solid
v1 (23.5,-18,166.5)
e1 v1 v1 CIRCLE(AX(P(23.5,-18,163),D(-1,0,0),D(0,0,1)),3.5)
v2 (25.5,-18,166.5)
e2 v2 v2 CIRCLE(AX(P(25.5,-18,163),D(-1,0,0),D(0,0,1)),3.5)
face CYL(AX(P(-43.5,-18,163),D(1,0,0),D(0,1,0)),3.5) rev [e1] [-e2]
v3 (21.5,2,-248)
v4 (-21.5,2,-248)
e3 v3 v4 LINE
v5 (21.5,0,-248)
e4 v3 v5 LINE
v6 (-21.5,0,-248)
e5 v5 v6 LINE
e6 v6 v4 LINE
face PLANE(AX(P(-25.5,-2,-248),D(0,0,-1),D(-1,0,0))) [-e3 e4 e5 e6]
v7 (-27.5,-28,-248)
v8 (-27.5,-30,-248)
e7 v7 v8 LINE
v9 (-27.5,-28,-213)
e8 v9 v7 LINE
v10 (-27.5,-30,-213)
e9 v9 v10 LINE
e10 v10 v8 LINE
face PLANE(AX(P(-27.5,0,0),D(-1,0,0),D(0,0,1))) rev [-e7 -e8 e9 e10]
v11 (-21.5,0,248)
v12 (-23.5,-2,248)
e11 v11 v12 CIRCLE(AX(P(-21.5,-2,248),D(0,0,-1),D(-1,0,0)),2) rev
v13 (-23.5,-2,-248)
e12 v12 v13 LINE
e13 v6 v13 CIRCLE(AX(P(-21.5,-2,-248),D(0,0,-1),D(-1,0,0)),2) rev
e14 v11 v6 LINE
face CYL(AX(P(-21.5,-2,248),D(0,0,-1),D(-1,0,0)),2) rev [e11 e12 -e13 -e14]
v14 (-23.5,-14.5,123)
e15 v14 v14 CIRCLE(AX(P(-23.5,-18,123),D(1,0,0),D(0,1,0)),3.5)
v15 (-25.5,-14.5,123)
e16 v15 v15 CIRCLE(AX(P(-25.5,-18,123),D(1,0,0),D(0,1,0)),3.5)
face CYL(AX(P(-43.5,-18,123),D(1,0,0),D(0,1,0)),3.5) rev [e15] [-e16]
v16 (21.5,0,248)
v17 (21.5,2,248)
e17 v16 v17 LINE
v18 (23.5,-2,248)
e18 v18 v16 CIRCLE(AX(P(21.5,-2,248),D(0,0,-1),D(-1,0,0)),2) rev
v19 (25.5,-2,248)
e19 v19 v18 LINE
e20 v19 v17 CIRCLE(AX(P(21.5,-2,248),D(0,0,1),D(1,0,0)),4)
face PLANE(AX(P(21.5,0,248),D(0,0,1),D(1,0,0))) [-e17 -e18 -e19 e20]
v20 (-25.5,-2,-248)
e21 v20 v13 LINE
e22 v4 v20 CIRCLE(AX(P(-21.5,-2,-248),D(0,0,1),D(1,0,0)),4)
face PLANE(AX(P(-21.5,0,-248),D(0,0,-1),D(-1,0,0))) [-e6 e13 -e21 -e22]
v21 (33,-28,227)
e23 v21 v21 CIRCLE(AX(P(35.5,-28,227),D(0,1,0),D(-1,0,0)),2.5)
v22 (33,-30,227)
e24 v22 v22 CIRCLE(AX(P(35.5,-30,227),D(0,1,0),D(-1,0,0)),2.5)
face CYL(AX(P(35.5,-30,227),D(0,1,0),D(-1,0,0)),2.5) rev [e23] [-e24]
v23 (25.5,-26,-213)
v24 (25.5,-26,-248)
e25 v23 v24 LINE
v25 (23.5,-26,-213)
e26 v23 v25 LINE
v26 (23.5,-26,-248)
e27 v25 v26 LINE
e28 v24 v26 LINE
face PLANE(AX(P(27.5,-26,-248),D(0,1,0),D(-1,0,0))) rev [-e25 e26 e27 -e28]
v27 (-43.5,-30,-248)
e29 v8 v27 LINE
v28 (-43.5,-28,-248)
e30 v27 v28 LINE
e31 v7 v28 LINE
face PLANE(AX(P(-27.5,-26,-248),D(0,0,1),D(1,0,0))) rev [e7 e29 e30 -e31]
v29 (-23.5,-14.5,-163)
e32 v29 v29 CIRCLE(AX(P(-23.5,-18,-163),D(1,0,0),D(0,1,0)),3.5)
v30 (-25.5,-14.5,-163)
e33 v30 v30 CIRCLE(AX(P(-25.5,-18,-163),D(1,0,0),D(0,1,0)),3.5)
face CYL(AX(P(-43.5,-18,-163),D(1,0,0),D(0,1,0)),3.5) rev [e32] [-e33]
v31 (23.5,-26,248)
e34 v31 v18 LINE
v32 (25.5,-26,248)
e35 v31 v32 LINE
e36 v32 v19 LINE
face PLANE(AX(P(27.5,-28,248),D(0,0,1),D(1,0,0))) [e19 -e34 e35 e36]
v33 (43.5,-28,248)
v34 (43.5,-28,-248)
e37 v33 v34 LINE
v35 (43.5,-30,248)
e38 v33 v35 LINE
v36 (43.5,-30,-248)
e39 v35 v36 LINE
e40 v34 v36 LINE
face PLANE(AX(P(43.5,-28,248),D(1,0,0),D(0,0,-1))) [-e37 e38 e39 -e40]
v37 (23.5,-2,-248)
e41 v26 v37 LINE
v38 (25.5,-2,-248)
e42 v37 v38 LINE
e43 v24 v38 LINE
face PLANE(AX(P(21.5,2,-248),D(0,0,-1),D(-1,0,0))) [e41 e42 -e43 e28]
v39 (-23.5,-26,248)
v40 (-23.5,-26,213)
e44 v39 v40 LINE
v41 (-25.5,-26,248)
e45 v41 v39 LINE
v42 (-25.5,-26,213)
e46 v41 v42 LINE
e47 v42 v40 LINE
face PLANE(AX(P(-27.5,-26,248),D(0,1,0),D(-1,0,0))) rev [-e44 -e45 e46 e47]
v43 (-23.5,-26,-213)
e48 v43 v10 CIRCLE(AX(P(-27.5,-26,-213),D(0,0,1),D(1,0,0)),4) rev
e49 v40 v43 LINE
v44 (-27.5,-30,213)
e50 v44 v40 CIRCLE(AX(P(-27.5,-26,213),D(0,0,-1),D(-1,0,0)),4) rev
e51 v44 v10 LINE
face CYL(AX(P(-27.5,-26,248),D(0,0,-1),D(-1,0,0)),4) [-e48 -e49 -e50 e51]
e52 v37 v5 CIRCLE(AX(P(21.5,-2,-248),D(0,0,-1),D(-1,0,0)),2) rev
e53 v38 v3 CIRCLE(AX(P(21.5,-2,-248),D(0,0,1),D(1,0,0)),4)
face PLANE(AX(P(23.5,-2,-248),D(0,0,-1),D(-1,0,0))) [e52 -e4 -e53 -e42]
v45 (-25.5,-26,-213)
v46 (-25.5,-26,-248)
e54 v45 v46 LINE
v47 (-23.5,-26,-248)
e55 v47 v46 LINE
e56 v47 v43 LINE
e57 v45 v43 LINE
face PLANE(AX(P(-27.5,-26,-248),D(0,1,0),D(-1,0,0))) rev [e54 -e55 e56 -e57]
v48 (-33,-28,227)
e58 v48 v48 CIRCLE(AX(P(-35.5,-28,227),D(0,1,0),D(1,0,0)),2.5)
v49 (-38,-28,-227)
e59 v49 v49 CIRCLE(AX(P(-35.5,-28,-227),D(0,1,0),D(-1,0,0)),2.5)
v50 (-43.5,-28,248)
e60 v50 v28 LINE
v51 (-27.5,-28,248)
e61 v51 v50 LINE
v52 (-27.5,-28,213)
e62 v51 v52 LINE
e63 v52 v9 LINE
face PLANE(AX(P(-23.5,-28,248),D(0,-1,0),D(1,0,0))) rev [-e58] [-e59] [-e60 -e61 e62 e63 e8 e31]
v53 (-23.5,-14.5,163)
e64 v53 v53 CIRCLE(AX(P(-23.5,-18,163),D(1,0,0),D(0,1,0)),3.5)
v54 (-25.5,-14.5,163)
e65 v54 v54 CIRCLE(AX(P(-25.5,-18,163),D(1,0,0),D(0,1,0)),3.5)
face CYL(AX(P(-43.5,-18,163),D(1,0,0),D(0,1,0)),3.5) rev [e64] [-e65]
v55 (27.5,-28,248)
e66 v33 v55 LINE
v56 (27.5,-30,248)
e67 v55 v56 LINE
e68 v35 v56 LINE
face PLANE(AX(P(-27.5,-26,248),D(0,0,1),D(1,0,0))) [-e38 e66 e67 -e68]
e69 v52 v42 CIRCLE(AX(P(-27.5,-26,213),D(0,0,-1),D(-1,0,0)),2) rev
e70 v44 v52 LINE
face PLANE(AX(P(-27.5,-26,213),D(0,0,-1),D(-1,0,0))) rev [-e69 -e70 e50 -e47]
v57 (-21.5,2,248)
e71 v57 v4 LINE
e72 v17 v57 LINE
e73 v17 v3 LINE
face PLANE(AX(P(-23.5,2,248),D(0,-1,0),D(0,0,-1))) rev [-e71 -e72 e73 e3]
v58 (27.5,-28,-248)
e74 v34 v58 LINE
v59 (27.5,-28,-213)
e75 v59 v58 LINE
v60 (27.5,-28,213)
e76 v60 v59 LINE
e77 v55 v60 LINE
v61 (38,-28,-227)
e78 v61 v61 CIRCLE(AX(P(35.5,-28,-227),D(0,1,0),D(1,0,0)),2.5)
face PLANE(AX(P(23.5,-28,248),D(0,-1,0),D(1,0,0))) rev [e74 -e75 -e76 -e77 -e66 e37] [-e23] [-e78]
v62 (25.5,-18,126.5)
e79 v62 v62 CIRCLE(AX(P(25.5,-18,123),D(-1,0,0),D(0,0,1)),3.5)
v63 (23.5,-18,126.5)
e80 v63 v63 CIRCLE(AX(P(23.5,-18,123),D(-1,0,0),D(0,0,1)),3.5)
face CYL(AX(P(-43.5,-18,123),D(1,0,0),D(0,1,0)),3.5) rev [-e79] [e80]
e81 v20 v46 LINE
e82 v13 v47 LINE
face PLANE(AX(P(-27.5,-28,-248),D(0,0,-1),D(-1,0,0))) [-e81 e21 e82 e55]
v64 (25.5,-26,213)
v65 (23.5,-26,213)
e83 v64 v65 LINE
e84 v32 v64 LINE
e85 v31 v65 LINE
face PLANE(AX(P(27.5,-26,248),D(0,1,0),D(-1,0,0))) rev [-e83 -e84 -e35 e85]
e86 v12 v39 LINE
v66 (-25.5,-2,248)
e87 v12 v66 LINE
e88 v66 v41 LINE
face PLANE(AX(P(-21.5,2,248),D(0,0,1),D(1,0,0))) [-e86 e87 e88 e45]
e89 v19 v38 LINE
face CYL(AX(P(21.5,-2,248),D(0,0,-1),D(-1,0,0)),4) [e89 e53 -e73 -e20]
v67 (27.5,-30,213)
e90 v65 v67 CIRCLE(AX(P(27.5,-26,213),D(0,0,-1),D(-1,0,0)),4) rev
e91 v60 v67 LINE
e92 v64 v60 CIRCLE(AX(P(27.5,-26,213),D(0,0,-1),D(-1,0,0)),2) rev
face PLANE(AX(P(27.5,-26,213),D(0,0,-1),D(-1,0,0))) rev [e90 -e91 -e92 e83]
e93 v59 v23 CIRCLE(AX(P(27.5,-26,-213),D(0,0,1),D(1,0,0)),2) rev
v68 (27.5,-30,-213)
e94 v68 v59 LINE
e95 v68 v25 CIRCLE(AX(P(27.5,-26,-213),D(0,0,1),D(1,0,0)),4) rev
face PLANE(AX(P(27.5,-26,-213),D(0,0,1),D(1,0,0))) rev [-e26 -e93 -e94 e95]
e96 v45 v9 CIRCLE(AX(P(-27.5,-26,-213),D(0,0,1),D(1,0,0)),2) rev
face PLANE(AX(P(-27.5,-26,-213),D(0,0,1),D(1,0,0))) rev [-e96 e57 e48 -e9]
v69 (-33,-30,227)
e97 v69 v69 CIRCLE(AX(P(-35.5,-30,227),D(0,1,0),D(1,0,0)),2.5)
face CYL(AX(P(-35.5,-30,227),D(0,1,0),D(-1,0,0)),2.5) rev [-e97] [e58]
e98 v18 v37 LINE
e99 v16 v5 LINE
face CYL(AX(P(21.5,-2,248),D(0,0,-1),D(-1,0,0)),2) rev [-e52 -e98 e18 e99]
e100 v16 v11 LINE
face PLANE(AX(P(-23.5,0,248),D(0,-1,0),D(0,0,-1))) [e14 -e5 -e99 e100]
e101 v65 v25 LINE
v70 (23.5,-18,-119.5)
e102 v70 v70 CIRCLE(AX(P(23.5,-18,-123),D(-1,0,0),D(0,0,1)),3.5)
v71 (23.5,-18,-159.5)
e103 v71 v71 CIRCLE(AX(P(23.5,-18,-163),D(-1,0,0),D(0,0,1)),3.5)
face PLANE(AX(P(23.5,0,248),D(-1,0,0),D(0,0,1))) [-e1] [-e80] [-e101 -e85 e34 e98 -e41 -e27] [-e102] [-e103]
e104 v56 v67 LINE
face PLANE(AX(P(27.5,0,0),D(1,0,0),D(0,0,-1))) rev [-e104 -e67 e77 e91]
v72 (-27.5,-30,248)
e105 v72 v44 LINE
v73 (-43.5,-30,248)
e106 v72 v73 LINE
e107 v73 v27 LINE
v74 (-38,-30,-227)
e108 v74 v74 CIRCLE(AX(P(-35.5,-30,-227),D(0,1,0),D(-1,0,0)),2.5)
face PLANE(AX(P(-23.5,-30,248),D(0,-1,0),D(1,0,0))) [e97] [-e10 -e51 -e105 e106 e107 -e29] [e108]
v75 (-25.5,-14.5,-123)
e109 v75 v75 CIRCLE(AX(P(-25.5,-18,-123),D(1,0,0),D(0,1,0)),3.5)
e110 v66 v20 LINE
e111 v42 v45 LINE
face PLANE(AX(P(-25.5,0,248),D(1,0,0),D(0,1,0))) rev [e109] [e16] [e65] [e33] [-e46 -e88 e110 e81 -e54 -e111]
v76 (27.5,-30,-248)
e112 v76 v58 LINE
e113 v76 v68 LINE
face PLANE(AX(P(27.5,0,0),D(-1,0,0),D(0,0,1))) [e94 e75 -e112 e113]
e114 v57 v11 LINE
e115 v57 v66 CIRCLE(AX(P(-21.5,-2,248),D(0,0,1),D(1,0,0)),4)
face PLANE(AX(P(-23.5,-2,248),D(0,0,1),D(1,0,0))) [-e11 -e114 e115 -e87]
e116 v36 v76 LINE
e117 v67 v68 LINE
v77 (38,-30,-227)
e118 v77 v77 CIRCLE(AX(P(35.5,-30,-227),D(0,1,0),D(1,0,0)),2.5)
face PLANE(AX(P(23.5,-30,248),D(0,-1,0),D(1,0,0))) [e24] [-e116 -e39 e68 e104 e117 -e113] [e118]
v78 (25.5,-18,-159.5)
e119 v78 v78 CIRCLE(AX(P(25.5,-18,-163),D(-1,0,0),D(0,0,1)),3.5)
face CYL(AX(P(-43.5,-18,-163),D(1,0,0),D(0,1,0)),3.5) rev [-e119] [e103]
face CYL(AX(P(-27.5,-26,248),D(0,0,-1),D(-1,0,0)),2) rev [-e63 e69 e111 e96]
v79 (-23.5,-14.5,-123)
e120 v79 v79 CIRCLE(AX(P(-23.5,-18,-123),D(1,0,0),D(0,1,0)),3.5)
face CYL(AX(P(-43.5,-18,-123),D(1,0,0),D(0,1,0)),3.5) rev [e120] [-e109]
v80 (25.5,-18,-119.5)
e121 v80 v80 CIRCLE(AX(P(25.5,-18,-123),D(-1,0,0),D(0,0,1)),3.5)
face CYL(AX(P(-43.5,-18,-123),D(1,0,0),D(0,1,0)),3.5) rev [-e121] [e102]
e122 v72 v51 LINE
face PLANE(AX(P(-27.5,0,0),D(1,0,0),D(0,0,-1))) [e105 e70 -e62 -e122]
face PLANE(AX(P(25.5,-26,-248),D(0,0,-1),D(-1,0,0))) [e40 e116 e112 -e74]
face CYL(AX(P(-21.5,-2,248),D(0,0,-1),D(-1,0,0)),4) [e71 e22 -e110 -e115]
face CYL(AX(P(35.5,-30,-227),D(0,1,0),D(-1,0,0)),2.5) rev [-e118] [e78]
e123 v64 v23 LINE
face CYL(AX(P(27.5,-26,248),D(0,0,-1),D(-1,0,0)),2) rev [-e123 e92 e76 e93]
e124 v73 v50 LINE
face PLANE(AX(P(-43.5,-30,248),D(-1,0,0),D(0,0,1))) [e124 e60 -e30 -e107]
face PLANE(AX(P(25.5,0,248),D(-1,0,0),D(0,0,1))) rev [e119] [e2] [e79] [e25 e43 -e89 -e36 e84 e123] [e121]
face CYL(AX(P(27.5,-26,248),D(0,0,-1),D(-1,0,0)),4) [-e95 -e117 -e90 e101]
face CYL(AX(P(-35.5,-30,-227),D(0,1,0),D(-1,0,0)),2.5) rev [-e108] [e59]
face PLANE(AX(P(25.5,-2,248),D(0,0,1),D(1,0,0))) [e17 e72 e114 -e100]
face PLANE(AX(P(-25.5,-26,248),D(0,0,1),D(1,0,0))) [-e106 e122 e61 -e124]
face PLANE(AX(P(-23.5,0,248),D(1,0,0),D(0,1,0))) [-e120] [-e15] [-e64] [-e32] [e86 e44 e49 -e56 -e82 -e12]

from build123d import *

# Parameters (mm, degrees)
SM_BASE_FLANGE_1_DEPTH   = 248
SKETCH_7_W               = 35
SKETCH_7_H               = 4
CUT_EXTRUDE_1_DEPTH      = 4
SKETCH_8_W               = 35
SKETCH_8_H               = 4
CUT_EXTRUDE_2_DEPTH      = 4
SKETCH_9_R               = 2.5
CUT_EXTRUDE_3_DEPTH      = 4
SKETCH_11_W              = 8.403654654
SKETCH_11_H              = 30.785672442
SKETCH_11_H_2            = 25.612573904
SM_BASE_FLANGE_1_2_DEPTH = 2
CUT_EXTRUDE_5_DEPTH      = 259.636810992
CUT_EXTRUDE_5_DEPTH_BACK = 259.636810992
SKETCH_14_R              = 3.5


# Sheet-metal steps are written as plain solids
with BuildPart() as part:
    # Sketch 1 → Sm Base Flange 1 (new, symmetric)
    with BuildSketch(Plane.XY):
        with BuildLine():
            Line((-43.5, -30), (-27.5, -30))
            ThreePointArc((-27.5, -30), (-24.671572875, -28.828427125), (-23.5, -26))
            Line((-23.5, -26), (-23.5, -2))
            ThreePointArc((-23.5, -2), (-22.914213562, -0.585786438), (-21.5, 0))
            Line((-21.5, 0), (21.5, 0))
            ThreePointArc((21.5, 0), (22.914213562, -0.585786438), (23.5, -2))
            Line((23.5, -2), (23.5, -26))
            ThreePointArc((23.5, -26), (24.671572875, -28.828427125), (27.5, -30))
            Line((27.5, -30), (43.5, -30))
            Line((43.5, -30), (43.5, -28))
            Line((43.5, -28), (27.5, -28))
            ThreePointArc((27.5, -28), (26.085786438, -27.414213562), (25.5, -26))
            Line((25.5, -26), (25.5, -2))
            ThreePointArc((25.5, -2), (24.328427125, 0.828427125), (21.5, 2))
            Line((21.5, 2), (-21.5, 2))
            ThreePointArc((-21.5, 2), (-24.328427125, 0.828427125), (-25.5, -2))
            Line((-25.5, -2), (-25.5, -26))
            ThreePointArc((-25.5, -26), (-26.085786438, -27.414213562), (-27.5, -28))
            Line((-27.5, -28), (-43.5, -28))
            Line((-43.5, -28), (-43.5, -30))
        make_face()
    extrude(amount=SM_BASE_FLANGE_1_DEPTH, both=True)

    # Эскиз7 → Вырез-Вытянуть1 (cut)
    with BuildSketch(Plane.ZY.offset(-23.5)):
        with Locations((230.5, -28)):
            Rectangle(SKETCH_7_W, SKETCH_7_H)
        with Locations((-230.5, -28)):
            Rectangle(SKETCH_7_W, SKETCH_7_H)
    extrude(amount=-CUT_EXTRUDE_1_DEPTH, mode=Mode.SUBTRACT)

    # Эскиз8 → Вырез-Вытянуть2 (cut)
    with BuildSketch(Plane(origin=(-23.5, 0, 0), x_dir=(0, 0, -1), z_dir=(1, 0, 0))):
        with Locations((230.5, -28)):
            Rectangle(SKETCH_8_W, SKETCH_8_H)
        with Locations((-230.5, -28)):
            Rectangle(SKETCH_8_W, SKETCH_8_H)
    extrude(amount=-CUT_EXTRUDE_2_DEPTH, mode=Mode.SUBTRACT)

    # Эскиз9 → Вырез-Вытянуть3 (cut)
    with BuildSketch(Plane(origin=(0, -28, 0), x_dir=(1, 0, 0), z_dir=(0, 1, 0))):
        with Locations(Location((-35.5, 227, 0), (0, 0, 180))):
            Circle(SKETCH_9_R)
        with Locations(Location((-34.5, 195, 0), (0, 0, 180))):
            Circle(SKETCH_9_R)
        with Locations(Location((-34.5, 179, 0), (0, 0, 180))):
            Circle(SKETCH_9_R)
        with Locations((-34.5, -179)):
            Circle(SKETCH_9_R)
        with Locations((-34.5, -195)):
            Circle(SKETCH_9_R)
        with Locations((-35.5, -227)):
            Circle(SKETCH_9_R)
        with Locations((35.5, 227)):
            Circle(SKETCH_9_R)
        with Locations(Location((35.5, -227, 0), (0, 0, 180))):
            Circle(SKETCH_9_R)
    extrude(amount=-CUT_EXTRUDE_3_DEPTH, mode=Mode.SUBTRACT)

    # Эскиз11 → Sm Base Flange 1 2 (add)
    with BuildSketch(Plane(origin=(0, -28, 0), x_dir=(1, 0, 0), z_dir=(0, 1, 0))):
        with Locations((-34.752058472, -185.409493447)):
            Rectangle(SKETCH_11_W, SKETCH_11_H)
        with Locations((-34.752058472, 186.746789547)):
            Rectangle(SKETCH_11_W, SKETCH_11_H_2)
    extrude(amount=-SM_BASE_FLANGE_1_2_DEPTH)

    # Эскиз14 → Вырез-Вытянуть5 (cut, two sides: drawn at the far end of the back side and taken through both)
    with BuildSketch(Plane(origin=(-23.5, 0, 0), x_dir=(0, 0, -1), z_dir=(1, 0, 0)).offset(-CUT_EXTRUDE_5_DEPTH_BACK)):
        with Locations(Location((-163, -18, 0), (0, 0, 90))):
            Circle(SKETCH_14_R)
        with Locations(Location((-123, -18, 0), (0, 0, 90))):
            Circle(SKETCH_14_R)
        with Locations(Location((123, -18, 0), (0, 0, 90))):
            Circle(SKETCH_14_R)
        with Locations(Location((163, -18, 0), (0, 0, 90))):
            Circle(SKETCH_14_R)
    extrude(amount=CUT_EXTRUDE_5_DEPTH + CUT_EXTRUDE_5_DEPTH_BACK, mode=Mode.SUBTRACT)


solid = part.part
